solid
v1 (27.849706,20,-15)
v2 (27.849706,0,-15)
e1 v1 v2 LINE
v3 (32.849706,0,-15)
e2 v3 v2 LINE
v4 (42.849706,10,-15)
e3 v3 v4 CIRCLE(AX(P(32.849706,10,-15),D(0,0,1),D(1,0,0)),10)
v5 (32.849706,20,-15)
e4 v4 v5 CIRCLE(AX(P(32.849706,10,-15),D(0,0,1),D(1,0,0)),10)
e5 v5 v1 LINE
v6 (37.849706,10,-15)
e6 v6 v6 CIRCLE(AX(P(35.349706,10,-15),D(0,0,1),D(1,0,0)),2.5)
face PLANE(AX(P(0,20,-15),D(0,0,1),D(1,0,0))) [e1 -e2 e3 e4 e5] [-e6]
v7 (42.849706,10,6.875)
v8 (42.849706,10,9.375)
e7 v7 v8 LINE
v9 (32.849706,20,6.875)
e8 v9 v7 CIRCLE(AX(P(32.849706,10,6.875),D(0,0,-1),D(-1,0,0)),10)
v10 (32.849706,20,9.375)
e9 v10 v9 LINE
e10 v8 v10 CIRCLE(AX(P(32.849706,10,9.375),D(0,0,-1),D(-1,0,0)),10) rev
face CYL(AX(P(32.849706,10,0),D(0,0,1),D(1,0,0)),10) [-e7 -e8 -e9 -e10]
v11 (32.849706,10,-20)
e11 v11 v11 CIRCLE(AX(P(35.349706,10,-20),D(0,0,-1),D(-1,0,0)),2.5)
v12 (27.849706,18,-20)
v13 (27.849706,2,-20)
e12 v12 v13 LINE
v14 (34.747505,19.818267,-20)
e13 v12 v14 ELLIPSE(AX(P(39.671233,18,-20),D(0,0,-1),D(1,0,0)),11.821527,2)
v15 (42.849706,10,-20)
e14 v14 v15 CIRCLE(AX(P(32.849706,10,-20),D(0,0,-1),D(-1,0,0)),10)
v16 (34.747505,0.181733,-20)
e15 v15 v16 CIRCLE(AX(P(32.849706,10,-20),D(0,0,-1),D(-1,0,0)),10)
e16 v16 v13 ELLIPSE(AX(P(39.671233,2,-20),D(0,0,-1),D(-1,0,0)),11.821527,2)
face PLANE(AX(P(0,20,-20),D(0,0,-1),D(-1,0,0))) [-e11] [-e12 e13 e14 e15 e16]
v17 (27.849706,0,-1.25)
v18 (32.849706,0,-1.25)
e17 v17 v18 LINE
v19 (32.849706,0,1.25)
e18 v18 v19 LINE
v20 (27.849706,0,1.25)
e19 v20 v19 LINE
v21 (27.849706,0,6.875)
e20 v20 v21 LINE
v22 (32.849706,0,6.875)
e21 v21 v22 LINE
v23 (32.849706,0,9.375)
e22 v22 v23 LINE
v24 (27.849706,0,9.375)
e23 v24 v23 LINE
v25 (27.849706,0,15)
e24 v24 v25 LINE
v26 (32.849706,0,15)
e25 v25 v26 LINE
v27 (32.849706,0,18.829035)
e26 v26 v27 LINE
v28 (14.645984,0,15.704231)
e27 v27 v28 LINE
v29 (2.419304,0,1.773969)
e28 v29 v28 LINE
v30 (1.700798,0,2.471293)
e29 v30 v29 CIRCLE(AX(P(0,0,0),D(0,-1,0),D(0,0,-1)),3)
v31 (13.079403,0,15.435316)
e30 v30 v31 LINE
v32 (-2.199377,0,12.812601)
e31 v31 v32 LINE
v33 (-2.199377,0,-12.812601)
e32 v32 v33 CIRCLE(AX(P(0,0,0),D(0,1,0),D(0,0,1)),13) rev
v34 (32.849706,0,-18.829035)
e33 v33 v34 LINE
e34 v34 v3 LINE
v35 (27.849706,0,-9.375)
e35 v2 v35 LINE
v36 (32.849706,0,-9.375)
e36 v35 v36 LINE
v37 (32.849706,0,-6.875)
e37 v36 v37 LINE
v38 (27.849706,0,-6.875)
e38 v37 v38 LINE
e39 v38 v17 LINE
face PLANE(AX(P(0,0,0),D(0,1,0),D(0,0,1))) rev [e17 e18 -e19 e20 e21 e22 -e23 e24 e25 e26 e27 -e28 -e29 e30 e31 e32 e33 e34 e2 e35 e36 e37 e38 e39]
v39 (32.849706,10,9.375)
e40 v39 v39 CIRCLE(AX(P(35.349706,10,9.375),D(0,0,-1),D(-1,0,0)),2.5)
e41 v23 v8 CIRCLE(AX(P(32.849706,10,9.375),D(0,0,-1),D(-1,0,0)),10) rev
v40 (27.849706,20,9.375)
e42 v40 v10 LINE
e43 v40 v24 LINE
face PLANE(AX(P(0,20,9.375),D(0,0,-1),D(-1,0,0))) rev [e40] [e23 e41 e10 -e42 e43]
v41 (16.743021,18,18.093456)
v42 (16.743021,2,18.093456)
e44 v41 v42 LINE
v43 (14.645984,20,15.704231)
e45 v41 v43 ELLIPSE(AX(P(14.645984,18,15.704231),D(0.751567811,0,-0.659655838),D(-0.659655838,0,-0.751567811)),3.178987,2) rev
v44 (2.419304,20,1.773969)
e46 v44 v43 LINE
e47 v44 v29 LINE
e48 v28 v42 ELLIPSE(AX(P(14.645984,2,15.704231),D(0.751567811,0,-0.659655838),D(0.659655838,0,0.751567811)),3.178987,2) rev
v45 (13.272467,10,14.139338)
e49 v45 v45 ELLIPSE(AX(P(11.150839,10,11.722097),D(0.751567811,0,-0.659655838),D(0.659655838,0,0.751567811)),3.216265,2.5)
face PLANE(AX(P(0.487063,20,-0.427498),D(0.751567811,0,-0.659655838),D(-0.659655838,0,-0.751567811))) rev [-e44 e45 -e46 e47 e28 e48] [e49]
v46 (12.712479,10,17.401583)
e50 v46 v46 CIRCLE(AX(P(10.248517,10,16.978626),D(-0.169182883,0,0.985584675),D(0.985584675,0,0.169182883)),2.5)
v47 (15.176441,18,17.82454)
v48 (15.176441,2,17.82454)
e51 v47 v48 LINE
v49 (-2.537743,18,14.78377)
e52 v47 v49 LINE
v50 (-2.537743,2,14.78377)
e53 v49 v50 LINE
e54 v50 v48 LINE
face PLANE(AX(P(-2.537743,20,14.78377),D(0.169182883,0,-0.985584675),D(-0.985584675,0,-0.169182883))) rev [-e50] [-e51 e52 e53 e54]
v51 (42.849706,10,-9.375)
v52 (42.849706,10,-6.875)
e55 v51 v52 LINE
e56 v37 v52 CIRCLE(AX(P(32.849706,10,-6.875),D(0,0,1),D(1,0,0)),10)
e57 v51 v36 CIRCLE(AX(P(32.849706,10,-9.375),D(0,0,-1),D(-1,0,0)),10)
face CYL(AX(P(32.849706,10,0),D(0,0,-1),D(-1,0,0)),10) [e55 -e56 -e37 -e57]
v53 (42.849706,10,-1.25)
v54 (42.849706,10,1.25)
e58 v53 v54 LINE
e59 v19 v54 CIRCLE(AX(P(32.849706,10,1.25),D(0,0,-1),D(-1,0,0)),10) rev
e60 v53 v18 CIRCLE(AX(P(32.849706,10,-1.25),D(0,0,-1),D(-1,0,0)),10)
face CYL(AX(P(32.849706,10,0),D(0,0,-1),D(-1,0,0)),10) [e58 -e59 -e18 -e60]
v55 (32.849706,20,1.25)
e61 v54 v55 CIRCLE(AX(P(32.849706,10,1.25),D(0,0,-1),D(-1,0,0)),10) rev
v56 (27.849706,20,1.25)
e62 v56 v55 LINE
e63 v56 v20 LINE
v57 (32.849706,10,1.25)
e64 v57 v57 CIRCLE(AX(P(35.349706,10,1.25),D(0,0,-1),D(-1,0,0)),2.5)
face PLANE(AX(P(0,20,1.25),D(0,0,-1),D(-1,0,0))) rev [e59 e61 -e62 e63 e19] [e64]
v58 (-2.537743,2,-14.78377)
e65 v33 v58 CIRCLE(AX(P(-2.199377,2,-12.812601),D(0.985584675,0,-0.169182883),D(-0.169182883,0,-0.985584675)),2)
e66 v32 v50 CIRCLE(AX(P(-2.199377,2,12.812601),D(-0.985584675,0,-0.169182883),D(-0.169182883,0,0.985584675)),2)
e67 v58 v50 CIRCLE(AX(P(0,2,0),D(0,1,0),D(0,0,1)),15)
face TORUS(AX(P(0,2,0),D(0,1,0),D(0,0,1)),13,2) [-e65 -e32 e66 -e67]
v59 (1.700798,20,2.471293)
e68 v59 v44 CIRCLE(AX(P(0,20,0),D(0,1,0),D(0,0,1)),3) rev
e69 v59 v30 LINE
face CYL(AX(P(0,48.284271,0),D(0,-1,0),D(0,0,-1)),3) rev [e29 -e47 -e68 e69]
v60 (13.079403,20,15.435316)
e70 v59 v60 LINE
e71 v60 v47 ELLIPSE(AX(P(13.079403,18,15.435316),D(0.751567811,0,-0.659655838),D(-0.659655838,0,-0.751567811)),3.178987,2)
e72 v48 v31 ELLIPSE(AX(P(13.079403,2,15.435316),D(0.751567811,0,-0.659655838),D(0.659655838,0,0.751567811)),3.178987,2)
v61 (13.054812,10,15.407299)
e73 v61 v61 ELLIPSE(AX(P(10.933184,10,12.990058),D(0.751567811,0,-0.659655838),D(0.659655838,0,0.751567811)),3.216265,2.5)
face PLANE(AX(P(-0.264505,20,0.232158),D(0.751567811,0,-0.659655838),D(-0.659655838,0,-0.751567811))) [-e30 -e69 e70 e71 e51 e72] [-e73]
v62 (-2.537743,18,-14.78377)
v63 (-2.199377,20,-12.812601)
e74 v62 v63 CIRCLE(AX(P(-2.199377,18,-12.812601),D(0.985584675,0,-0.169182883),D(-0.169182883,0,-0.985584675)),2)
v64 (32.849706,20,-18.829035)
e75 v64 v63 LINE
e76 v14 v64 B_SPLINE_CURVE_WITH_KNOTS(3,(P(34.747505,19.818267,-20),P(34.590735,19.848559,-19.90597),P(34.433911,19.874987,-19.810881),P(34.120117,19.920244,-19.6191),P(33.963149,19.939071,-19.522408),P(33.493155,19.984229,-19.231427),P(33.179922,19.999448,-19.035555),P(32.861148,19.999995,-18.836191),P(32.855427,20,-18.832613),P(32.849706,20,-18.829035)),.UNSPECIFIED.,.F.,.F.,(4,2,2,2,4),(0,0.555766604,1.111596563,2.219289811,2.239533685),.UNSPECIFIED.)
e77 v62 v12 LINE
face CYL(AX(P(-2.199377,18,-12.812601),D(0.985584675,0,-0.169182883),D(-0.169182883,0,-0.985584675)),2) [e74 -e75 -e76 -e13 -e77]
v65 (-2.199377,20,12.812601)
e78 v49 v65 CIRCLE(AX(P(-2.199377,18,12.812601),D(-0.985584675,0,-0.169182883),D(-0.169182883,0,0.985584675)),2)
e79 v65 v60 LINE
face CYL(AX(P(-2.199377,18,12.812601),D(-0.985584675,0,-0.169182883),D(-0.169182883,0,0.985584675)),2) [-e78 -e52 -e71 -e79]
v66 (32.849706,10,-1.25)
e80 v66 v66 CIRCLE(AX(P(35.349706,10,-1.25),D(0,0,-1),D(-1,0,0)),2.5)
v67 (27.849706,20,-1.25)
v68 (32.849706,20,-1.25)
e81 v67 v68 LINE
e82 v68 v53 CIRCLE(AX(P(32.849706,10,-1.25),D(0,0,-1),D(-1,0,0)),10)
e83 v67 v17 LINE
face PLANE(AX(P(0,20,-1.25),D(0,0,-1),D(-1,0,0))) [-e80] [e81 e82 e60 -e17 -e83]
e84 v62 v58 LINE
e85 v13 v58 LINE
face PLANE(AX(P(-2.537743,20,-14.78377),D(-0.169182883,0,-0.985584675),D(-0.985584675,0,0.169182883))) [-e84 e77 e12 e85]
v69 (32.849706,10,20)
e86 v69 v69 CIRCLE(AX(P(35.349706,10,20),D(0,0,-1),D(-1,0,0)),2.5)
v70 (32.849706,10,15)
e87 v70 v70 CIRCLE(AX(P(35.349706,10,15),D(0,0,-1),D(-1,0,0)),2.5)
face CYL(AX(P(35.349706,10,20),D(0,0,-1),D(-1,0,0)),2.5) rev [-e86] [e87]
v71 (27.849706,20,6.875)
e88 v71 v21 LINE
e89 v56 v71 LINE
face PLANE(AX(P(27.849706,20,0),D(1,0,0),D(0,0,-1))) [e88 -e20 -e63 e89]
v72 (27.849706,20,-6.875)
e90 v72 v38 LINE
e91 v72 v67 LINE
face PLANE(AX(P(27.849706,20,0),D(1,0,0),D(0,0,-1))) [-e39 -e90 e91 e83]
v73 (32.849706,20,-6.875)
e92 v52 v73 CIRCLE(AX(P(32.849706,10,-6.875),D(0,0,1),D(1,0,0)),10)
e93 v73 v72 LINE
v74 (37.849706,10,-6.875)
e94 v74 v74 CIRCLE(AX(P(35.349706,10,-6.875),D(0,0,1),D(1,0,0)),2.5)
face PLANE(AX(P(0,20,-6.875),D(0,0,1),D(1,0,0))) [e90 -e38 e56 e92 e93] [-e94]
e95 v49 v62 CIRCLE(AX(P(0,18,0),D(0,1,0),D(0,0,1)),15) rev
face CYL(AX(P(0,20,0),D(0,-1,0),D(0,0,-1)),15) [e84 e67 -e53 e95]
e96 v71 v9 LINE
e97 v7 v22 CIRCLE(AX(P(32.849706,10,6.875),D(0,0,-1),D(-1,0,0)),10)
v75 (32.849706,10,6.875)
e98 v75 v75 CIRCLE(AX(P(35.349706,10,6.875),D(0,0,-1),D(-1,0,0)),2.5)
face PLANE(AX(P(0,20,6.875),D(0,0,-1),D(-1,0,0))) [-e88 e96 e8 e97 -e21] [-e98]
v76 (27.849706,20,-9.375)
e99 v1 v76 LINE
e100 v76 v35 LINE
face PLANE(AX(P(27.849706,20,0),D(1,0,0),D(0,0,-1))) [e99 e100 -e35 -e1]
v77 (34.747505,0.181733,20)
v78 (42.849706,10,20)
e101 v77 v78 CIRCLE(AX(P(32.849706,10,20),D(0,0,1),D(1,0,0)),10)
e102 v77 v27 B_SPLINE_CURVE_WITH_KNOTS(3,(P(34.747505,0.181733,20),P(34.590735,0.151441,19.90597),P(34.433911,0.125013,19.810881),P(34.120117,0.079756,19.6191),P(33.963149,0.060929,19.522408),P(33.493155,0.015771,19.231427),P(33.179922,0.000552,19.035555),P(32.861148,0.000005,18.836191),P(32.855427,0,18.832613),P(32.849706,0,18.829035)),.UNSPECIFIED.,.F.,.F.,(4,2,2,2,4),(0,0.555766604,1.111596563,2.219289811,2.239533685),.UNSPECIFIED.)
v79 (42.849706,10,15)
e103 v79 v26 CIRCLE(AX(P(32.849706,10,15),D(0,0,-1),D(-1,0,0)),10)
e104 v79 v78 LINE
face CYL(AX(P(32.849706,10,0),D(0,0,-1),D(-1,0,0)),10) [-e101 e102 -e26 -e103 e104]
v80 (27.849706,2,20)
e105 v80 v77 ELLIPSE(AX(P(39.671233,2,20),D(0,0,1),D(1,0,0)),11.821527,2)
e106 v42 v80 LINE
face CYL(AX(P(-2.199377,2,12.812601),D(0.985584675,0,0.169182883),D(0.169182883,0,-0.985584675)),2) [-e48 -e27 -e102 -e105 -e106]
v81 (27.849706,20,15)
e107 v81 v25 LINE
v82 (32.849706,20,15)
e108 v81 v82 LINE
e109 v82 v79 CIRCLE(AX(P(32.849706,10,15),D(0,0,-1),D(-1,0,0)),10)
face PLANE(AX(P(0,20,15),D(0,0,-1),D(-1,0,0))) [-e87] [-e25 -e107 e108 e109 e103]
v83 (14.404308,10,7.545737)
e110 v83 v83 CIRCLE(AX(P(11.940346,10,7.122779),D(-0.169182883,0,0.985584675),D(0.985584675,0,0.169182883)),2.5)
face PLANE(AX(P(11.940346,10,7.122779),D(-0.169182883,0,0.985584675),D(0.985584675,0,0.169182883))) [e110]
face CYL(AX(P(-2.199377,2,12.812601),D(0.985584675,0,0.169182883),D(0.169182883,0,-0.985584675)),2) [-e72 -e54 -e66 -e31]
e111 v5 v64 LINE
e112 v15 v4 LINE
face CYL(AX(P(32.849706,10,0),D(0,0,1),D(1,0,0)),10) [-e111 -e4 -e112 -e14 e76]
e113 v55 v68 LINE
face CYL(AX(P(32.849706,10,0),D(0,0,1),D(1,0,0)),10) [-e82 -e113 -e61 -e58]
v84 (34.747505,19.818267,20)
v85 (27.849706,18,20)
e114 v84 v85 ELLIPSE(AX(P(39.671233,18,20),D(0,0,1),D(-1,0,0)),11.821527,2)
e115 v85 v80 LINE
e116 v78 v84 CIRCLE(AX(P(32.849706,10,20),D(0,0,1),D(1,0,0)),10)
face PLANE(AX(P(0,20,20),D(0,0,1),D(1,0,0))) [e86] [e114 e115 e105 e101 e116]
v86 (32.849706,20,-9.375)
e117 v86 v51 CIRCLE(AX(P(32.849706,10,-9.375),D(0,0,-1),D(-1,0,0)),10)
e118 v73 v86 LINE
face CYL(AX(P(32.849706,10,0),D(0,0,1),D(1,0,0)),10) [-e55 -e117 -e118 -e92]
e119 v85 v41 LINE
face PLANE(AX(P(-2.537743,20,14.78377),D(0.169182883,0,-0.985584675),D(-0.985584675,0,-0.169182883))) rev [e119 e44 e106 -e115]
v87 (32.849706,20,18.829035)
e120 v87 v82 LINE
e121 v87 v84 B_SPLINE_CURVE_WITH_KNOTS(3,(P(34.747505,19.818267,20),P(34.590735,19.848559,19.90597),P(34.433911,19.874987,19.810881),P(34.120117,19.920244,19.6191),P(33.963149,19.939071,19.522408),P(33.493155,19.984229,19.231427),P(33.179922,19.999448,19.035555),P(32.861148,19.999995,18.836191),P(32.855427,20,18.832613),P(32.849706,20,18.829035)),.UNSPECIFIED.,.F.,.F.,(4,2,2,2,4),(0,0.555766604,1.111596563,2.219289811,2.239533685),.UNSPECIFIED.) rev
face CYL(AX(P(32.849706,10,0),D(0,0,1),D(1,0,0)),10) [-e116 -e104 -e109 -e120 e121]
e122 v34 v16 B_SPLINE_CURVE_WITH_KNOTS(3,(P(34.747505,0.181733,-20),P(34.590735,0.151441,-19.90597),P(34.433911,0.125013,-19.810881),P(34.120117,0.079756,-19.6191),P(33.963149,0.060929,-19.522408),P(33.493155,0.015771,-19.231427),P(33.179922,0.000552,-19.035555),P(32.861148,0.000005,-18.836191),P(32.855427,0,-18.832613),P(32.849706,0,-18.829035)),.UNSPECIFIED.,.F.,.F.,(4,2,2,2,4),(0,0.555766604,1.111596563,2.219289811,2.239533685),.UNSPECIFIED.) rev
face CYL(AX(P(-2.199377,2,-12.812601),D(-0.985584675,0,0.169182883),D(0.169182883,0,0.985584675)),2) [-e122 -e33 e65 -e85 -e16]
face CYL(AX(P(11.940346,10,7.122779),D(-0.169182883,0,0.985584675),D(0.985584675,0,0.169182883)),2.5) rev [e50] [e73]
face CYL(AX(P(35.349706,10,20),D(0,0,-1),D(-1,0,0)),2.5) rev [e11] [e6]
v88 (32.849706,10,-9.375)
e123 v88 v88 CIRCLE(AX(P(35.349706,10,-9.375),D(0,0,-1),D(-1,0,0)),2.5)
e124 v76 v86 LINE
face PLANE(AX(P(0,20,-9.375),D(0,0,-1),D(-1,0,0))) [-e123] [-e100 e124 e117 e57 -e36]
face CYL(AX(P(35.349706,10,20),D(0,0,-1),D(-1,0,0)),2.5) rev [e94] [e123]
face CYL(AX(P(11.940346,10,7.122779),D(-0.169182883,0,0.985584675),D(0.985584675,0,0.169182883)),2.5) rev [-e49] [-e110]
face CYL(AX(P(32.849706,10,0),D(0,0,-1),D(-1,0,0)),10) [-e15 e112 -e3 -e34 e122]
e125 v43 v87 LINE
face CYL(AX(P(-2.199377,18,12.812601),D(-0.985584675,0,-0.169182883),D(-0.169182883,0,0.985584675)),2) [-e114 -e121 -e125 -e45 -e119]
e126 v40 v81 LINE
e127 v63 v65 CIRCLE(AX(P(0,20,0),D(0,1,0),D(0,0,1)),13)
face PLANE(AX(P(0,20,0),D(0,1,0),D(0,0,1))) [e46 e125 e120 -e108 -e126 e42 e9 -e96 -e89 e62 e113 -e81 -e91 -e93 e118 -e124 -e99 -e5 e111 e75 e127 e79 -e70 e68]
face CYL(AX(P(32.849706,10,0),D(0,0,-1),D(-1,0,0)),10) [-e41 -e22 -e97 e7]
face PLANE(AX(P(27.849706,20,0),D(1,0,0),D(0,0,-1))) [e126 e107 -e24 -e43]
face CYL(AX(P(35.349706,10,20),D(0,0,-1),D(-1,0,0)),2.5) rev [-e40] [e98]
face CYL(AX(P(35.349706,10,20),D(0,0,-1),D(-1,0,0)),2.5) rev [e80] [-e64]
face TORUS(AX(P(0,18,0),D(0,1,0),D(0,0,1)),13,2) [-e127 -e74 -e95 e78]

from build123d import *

# Parameters (mm, degrees)
BOSS_EXTRUDE1_DEPTH = 20
FILLET1_R           = 10
SKETCH2_R           = 2.5
CUT_EXTRUDE1_DEPTH  = 40
FILLET2_R           = 2
SKETCH3_R           = 2.5
CUT_EXTRUDE2_DEPTH  = 10
SKETCH4_R           = 10
SKETCH4_R_2         = 3
BOSS_EXTRUDE2_DEPTH = 20
CUT_EXTRUDE3_DEPTH  = 52.342938219


# Some blends are built 0.0001 mm under size
with BuildPart() as part:
    # Sketch1 → Boss-Extrude1 (new body)
    with BuildSketch(Plane(origin=(0, 0, 0), x_dir=(1, 0, 0), z_dir=(0, 1, 0))):
        with BuildLine():
            Line((27.849705815, 9.375), (27.849705815, 15))
            Line((27.849705815, 15), (42.849705815, 15))
            Line((42.849705815, 15), (42.849705815, 20))
            Line((42.849705815, 20), (27.849705815, 20))
            Line((27.849705815, 20), (-2.537743238, 14.78377013))
            ThreePointArc((-2.537743238, 14.78377013), (-15, 0), (-2.537743238, -14.78377013))
            Line((-2.537743238, -14.78377013), (15.176440556, -17.824540498))
            Line((15.176440556, -17.824540498), (6.327966589, -7.743180151))
            ThreePointArc((6.327966589, -7.743180151), (-6.707251498, 7.417059885), (7.069754095, -7.072381285))
            Line((7.069754095, -7.072381285), (16.743020962, -18.093455585))
            Line((16.743020962, -18.093455585), (27.849705815, -20))
            Line((27.849705815, -20), (42.849705815, -20))
            Line((42.849705815, -20), (42.849705815, -15))
            Line((42.849705815, -15), (27.849705815, -15))
            Line((27.849705815, -15), (27.849705815, -9.375))
            Line((27.849705815, -9.375), (42.849705815, -9.375))
            Line((42.849705815, -9.375), (42.849705815, -6.875))
            Line((42.849705815, -6.875), (27.849705815, -6.875))
            Line((27.849705815, -6.875), (27.849705815, -1.25))
            Line((27.849705815, -1.25), (42.849705815, -1.25))
            Line((42.849705815, -1.25), (42.849705815, 1.25))
            Line((42.849705815, 1.25), (27.849705815, 1.25))
            Line((27.849705815, 1.25), (27.849705815, 6.875))
            Line((27.849705815, 6.875), (42.849705815, 6.875))
            Line((42.849705815, 6.875), (42.849705815, 9.375))
            Line((42.849705815, 9.375), (27.849705815, 9.375))
        make_face()
    extrude(amount=BOSS_EXTRUDE1_DEPTH)

    # Fillet1
    fillet1_edges = [part.edges().sort_by_distance(p)[0] for p in [
        (42.849705815, 0, 17.5),
        (42.849705815, 0, 8.125),
        (42.849705815, 0, 0),
        (42.849705815, 0, -8.125),
        (42.849705815, 0, -17.5),
        (42.849705815, 20, -17.5),
        (42.849705815, 20, -8.125),
        (42.849705815, 20, 0),
        (42.849705815, 20, 8.125),
        (42.849705815, 20, 17.5),
    ]]
    fillet(fillet1_edges, radius=FILLET1_R - 0.0001)  # a hair under: the kernel refuses the full size

    # Sketch2 → Cut-Extrude1 (cut)
    with BuildSketch(Plane(origin=(0, 0, -20), x_dir=(-1, 0, 0), z_dir=(0, 0, -1))):
        with Locations((-35.349705815, 10)):
            Circle(SKETCH2_R)
    extrude(amount=-CUT_EXTRUDE1_DEPTH, mode=Mode.SUBTRACT)

    # Fillet2
    # the kernel refuses this fillet: 2 mm, written as the material it takes off along each edge
    with BuildSketch(Plane(origin=(39.676721919, 0, -22.03019459), x_dir=(0.16918288251037936, 0, 0.9855846753402162), z_dir=(-0.9855846753402161, 0, 0.16918288251037933))) as fillet2_piece_1:
        with BuildLine():
            CenterArc((FILLET2_R, FILLET2_R), FILLET2_R, 180, 90)
            Line((0, FILLET2_R), (-FILLET2_R * 0.02, FILLET2_R))
            Line((-FILLET2_R * 0.02, FILLET2_R), (-FILLET2_R * 0.02, -FILLET2_R * 0.02))
            Line((-FILLET2_R * 0.02, -FILLET2_R * 0.02), (FILLET2_R, -FILLET2_R * 0.02))
            Line((FILLET2_R, -FILLET2_R * 0.02), (FILLET2_R, 0))
        make_face()
    extrude(amount=42.831900914, mode=Mode.SUBTRACT)
    with BuildSketch(Plane(origin=(-2.537743238, 0, 14.78377013), x_dir=(0.16918288251037944, 0, -0.9855846753402161), z_dir=(0.9855846753402161, 0, 0.16918288251037944))) as fillet2_piece_2:
        with BuildLine():
            CenterArc((FILLET2_R, FILLET2_R), FILLET2_R, 180, 90)
            Line((0, FILLET2_R), (-FILLET2_R * 0.02, FILLET2_R))
            Line((-FILLET2_R * 0.02, FILLET2_R), (-FILLET2_R * 0.02, -FILLET2_R * 0.02))
            Line((-FILLET2_R * 0.02, -FILLET2_R * 0.02), (FILLET2_R, -FILLET2_R * 0.02))
            Line((FILLET2_R, -FILLET2_R * 0.02), (FILLET2_R, 0))
        make_face()
    extrude(amount=29.973274379, mode=Mode.SUBTRACT)
    with BuildSketch(Plane(origin=(39.676721919, 20, -22.03019459), x_dir=(0.16918288251037936, 0, 0.9855846753402162), z_dir=(-0.9855846753402161, 0, 0.16918288251037933))) as fillet2_piece_3:
        with BuildLine():
            CenterArc((FILLET2_R, -FILLET2_R), FILLET2_R, 90, 90)
            Line((0, -FILLET2_R), (-FILLET2_R * 0.02, -FILLET2_R))
            Line((-FILLET2_R * 0.02, -FILLET2_R), (-FILLET2_R * 0.02, FILLET2_R * 0.02))
            Line((-FILLET2_R * 0.02, FILLET2_R * 0.02), (FILLET2_R, FILLET2_R * 0.02))
            Line((FILLET2_R, FILLET2_R * 0.02), (FILLET2_R, 0))
        make_face()
    extrude(amount=42.831900914, mode=Mode.SUBTRACT)
    with BuildSketch(Plane(origin=(-2.537743238, 20, 14.78377013), x_dir=(0.16918288251037944, 0, -0.9855846753402161), z_dir=(0.9855846753402161, 0, 0.16918288251037944))) as fillet2_piece_4:
        with BuildLine():
            CenterArc((FILLET2_R, -FILLET2_R), FILLET2_R, 90, 90)
            Line((0, -FILLET2_R), (-FILLET2_R * 0.02, -FILLET2_R))
            Line((-FILLET2_R * 0.02, -FILLET2_R), (-FILLET2_R * 0.02, FILLET2_R * 0.02))
            Line((-FILLET2_R * 0.02, FILLET2_R * 0.02), (FILLET2_R, FILLET2_R * 0.02))
            Line((FILLET2_R, FILLET2_R * 0.02), (FILLET2_R, 0))
        make_face()
    extrude(amount=29.973274379, mode=Mode.SUBTRACT)
    with BuildSketch(Plane(origin=(4.916004858, 0, 16.063260995), x_dir=(0.16918288251037944, 0, -0.9855846753402161), z_dir=(0.9855846753402161, 0, 0.16918288251037944))) as fillet2_piece_5:
        with BuildLine():
            CenterArc((FILLET2_R, FILLET2_R), FILLET2_R, 180, 90)
            Line((0, FILLET2_R), (-FILLET2_R * 0.02, FILLET2_R))
            Line((-FILLET2_R * 0.02, FILLET2_R), (-FILLET2_R * 0.02, -FILLET2_R * 0.02))
            Line((-FILLET2_R * 0.02, -FILLET2_R * 0.02), (FILLET2_R, -FILLET2_R * 0.02))
            Line((FILLET2_R, -FILLET2_R * 0.02), (FILLET2_R, 0))
        make_face()
    extrude(amount=35.269133064, mode=Mode.SUBTRACT)
    with BuildSketch(Plane(origin=(4.916004858, 20, 16.063260995), x_dir=(0.16918288251037944, 0, -0.9855846753402161), z_dir=(0.9855846753402161, 0, 0.16918288251037944))) as fillet2_piece_6:
        with BuildLine():
            CenterArc((FILLET2_R, -FILLET2_R), FILLET2_R, 90, 90)
            Line((0, -FILLET2_R), (-FILLET2_R * 0.02, -FILLET2_R))
            Line((-FILLET2_R * 0.02, -FILLET2_R), (-FILLET2_R * 0.02, FILLET2_R * 0.02))
            Line((-FILLET2_R * 0.02, FILLET2_R * 0.02), (FILLET2_R, FILLET2_R * 0.02))
            Line((FILLET2_R, FILLET2_R * 0.02), (FILLET2_R, 0))
        make_face()
    extrude(amount=35.269133064, mode=Mode.SUBTRACT)
    with BuildSketch(Plane(origin=(0, 0, 0), x_dir=(-0.16918288251037905, 0, -0.9855846753402162), z_dir=(0.9855846753402162, 0, -0.16918288251037905))) as fillet2_piece_7:
        with BuildLine():
            CenterArc((15 - FILLET2_R, FILLET2_R), FILLET2_R, 270, 90)
            Line((15, FILLET2_R), (15 + FILLET2_R * 0.02, FILLET2_R))
            Line((15 + FILLET2_R * 0.02, FILLET2_R), (15 + FILLET2_R * 0.02, -FILLET2_R * 0.02))
            Line((15 + FILLET2_R * 0.02, -FILLET2_R * 0.02), (15 - FILLET2_R, -FILLET2_R * 0.02))
            Line((15 - FILLET2_R, -FILLET2_R * 0.02), (15 - FILLET2_R, 0))
        make_face()
    revolve(axis=Axis((0, 0, 0), (0, 1, 0)), revolution_arc=160.519372943, mode=Mode.SUBTRACT)
    with BuildSketch(Plane(origin=(0, 20, 0), x_dir=(-0.16918288251037905, 0, -0.9855846753402162), z_dir=(0.9855846753402162, 0, -0.16918288251037905))) as fillet2_piece_8:
        with BuildLine():
            CenterArc((15 - FILLET2_R, -FILLET2_R), FILLET2_R, 0, 90)
            Line((15, -FILLET2_R), (15 + FILLET2_R * 0.02, -FILLET2_R))
            Line((15 + FILLET2_R * 0.02, -FILLET2_R), (15 + FILLET2_R * 0.02, FILLET2_R * 0.02))
            Line((15 + FILLET2_R * 0.02, FILLET2_R * 0.02), (15 - FILLET2_R, FILLET2_R * 0.02))
            Line((15 - FILLET2_R, FILLET2_R * 0.02), (15 - FILLET2_R, 0))
        make_face()
    revolve(axis=Axis((0, 20, 0), (0, 1, 0)), revolution_arc=160.519372943, mode=Mode.SUBTRACT)

    # Sketch3 → Cut-Extrude2 (cut)
    with BuildSketch(Plane(origin=(-2.537743238, 0, 14.78377013), x_dir=(0.9855846753402161, 0, 0.16918288251037955), z_dir=(-0.16918288251037955, 0, 0.9855846753402161))):
        with Locations((12.973274379, 10)):
            Circle(SKETCH3_R)
    extrude(amount=-CUT_EXTRUDE2_DEPTH, mode=Mode.SUBTRACT)

    # Sketch4 → Boss-Extrude2 (add)
    with BuildSketch(Plane.XZ):
        Circle(SKETCH4_R)
        with Locations(Location((0, 0, 0), (0, 0, 270))):
            Circle(SKETCH4_R_2, mode=Mode.SUBTRACT)
    extrude(amount=-BOSS_EXTRUDE2_DEPTH)

    # Sketch6 → Cut-Extrude3 (cut, through all)
    with BuildSketch(Plane.XZ):
        with BuildLine():
            ThreePointArc((7.069754095, 7.072381285), (6.707251498, 7.417059885), (6.327966589, 7.743180151))
            Line((6.327966589, 7.743180151), (1.700797535, 2.471292727))
            ThreePointArc((1.700797535, 2.471292727), (2.089347904, 2.152817999), (2.419304242, 1.773969274))
            Line((2.419304242, 1.773969274), (7.069754095, 7.072381285))
        make_face()
    extrude(amount=-CUT_EXTRUDE3_DEPTH, mode=Mode.SUBTRACT)


solid = part.part
